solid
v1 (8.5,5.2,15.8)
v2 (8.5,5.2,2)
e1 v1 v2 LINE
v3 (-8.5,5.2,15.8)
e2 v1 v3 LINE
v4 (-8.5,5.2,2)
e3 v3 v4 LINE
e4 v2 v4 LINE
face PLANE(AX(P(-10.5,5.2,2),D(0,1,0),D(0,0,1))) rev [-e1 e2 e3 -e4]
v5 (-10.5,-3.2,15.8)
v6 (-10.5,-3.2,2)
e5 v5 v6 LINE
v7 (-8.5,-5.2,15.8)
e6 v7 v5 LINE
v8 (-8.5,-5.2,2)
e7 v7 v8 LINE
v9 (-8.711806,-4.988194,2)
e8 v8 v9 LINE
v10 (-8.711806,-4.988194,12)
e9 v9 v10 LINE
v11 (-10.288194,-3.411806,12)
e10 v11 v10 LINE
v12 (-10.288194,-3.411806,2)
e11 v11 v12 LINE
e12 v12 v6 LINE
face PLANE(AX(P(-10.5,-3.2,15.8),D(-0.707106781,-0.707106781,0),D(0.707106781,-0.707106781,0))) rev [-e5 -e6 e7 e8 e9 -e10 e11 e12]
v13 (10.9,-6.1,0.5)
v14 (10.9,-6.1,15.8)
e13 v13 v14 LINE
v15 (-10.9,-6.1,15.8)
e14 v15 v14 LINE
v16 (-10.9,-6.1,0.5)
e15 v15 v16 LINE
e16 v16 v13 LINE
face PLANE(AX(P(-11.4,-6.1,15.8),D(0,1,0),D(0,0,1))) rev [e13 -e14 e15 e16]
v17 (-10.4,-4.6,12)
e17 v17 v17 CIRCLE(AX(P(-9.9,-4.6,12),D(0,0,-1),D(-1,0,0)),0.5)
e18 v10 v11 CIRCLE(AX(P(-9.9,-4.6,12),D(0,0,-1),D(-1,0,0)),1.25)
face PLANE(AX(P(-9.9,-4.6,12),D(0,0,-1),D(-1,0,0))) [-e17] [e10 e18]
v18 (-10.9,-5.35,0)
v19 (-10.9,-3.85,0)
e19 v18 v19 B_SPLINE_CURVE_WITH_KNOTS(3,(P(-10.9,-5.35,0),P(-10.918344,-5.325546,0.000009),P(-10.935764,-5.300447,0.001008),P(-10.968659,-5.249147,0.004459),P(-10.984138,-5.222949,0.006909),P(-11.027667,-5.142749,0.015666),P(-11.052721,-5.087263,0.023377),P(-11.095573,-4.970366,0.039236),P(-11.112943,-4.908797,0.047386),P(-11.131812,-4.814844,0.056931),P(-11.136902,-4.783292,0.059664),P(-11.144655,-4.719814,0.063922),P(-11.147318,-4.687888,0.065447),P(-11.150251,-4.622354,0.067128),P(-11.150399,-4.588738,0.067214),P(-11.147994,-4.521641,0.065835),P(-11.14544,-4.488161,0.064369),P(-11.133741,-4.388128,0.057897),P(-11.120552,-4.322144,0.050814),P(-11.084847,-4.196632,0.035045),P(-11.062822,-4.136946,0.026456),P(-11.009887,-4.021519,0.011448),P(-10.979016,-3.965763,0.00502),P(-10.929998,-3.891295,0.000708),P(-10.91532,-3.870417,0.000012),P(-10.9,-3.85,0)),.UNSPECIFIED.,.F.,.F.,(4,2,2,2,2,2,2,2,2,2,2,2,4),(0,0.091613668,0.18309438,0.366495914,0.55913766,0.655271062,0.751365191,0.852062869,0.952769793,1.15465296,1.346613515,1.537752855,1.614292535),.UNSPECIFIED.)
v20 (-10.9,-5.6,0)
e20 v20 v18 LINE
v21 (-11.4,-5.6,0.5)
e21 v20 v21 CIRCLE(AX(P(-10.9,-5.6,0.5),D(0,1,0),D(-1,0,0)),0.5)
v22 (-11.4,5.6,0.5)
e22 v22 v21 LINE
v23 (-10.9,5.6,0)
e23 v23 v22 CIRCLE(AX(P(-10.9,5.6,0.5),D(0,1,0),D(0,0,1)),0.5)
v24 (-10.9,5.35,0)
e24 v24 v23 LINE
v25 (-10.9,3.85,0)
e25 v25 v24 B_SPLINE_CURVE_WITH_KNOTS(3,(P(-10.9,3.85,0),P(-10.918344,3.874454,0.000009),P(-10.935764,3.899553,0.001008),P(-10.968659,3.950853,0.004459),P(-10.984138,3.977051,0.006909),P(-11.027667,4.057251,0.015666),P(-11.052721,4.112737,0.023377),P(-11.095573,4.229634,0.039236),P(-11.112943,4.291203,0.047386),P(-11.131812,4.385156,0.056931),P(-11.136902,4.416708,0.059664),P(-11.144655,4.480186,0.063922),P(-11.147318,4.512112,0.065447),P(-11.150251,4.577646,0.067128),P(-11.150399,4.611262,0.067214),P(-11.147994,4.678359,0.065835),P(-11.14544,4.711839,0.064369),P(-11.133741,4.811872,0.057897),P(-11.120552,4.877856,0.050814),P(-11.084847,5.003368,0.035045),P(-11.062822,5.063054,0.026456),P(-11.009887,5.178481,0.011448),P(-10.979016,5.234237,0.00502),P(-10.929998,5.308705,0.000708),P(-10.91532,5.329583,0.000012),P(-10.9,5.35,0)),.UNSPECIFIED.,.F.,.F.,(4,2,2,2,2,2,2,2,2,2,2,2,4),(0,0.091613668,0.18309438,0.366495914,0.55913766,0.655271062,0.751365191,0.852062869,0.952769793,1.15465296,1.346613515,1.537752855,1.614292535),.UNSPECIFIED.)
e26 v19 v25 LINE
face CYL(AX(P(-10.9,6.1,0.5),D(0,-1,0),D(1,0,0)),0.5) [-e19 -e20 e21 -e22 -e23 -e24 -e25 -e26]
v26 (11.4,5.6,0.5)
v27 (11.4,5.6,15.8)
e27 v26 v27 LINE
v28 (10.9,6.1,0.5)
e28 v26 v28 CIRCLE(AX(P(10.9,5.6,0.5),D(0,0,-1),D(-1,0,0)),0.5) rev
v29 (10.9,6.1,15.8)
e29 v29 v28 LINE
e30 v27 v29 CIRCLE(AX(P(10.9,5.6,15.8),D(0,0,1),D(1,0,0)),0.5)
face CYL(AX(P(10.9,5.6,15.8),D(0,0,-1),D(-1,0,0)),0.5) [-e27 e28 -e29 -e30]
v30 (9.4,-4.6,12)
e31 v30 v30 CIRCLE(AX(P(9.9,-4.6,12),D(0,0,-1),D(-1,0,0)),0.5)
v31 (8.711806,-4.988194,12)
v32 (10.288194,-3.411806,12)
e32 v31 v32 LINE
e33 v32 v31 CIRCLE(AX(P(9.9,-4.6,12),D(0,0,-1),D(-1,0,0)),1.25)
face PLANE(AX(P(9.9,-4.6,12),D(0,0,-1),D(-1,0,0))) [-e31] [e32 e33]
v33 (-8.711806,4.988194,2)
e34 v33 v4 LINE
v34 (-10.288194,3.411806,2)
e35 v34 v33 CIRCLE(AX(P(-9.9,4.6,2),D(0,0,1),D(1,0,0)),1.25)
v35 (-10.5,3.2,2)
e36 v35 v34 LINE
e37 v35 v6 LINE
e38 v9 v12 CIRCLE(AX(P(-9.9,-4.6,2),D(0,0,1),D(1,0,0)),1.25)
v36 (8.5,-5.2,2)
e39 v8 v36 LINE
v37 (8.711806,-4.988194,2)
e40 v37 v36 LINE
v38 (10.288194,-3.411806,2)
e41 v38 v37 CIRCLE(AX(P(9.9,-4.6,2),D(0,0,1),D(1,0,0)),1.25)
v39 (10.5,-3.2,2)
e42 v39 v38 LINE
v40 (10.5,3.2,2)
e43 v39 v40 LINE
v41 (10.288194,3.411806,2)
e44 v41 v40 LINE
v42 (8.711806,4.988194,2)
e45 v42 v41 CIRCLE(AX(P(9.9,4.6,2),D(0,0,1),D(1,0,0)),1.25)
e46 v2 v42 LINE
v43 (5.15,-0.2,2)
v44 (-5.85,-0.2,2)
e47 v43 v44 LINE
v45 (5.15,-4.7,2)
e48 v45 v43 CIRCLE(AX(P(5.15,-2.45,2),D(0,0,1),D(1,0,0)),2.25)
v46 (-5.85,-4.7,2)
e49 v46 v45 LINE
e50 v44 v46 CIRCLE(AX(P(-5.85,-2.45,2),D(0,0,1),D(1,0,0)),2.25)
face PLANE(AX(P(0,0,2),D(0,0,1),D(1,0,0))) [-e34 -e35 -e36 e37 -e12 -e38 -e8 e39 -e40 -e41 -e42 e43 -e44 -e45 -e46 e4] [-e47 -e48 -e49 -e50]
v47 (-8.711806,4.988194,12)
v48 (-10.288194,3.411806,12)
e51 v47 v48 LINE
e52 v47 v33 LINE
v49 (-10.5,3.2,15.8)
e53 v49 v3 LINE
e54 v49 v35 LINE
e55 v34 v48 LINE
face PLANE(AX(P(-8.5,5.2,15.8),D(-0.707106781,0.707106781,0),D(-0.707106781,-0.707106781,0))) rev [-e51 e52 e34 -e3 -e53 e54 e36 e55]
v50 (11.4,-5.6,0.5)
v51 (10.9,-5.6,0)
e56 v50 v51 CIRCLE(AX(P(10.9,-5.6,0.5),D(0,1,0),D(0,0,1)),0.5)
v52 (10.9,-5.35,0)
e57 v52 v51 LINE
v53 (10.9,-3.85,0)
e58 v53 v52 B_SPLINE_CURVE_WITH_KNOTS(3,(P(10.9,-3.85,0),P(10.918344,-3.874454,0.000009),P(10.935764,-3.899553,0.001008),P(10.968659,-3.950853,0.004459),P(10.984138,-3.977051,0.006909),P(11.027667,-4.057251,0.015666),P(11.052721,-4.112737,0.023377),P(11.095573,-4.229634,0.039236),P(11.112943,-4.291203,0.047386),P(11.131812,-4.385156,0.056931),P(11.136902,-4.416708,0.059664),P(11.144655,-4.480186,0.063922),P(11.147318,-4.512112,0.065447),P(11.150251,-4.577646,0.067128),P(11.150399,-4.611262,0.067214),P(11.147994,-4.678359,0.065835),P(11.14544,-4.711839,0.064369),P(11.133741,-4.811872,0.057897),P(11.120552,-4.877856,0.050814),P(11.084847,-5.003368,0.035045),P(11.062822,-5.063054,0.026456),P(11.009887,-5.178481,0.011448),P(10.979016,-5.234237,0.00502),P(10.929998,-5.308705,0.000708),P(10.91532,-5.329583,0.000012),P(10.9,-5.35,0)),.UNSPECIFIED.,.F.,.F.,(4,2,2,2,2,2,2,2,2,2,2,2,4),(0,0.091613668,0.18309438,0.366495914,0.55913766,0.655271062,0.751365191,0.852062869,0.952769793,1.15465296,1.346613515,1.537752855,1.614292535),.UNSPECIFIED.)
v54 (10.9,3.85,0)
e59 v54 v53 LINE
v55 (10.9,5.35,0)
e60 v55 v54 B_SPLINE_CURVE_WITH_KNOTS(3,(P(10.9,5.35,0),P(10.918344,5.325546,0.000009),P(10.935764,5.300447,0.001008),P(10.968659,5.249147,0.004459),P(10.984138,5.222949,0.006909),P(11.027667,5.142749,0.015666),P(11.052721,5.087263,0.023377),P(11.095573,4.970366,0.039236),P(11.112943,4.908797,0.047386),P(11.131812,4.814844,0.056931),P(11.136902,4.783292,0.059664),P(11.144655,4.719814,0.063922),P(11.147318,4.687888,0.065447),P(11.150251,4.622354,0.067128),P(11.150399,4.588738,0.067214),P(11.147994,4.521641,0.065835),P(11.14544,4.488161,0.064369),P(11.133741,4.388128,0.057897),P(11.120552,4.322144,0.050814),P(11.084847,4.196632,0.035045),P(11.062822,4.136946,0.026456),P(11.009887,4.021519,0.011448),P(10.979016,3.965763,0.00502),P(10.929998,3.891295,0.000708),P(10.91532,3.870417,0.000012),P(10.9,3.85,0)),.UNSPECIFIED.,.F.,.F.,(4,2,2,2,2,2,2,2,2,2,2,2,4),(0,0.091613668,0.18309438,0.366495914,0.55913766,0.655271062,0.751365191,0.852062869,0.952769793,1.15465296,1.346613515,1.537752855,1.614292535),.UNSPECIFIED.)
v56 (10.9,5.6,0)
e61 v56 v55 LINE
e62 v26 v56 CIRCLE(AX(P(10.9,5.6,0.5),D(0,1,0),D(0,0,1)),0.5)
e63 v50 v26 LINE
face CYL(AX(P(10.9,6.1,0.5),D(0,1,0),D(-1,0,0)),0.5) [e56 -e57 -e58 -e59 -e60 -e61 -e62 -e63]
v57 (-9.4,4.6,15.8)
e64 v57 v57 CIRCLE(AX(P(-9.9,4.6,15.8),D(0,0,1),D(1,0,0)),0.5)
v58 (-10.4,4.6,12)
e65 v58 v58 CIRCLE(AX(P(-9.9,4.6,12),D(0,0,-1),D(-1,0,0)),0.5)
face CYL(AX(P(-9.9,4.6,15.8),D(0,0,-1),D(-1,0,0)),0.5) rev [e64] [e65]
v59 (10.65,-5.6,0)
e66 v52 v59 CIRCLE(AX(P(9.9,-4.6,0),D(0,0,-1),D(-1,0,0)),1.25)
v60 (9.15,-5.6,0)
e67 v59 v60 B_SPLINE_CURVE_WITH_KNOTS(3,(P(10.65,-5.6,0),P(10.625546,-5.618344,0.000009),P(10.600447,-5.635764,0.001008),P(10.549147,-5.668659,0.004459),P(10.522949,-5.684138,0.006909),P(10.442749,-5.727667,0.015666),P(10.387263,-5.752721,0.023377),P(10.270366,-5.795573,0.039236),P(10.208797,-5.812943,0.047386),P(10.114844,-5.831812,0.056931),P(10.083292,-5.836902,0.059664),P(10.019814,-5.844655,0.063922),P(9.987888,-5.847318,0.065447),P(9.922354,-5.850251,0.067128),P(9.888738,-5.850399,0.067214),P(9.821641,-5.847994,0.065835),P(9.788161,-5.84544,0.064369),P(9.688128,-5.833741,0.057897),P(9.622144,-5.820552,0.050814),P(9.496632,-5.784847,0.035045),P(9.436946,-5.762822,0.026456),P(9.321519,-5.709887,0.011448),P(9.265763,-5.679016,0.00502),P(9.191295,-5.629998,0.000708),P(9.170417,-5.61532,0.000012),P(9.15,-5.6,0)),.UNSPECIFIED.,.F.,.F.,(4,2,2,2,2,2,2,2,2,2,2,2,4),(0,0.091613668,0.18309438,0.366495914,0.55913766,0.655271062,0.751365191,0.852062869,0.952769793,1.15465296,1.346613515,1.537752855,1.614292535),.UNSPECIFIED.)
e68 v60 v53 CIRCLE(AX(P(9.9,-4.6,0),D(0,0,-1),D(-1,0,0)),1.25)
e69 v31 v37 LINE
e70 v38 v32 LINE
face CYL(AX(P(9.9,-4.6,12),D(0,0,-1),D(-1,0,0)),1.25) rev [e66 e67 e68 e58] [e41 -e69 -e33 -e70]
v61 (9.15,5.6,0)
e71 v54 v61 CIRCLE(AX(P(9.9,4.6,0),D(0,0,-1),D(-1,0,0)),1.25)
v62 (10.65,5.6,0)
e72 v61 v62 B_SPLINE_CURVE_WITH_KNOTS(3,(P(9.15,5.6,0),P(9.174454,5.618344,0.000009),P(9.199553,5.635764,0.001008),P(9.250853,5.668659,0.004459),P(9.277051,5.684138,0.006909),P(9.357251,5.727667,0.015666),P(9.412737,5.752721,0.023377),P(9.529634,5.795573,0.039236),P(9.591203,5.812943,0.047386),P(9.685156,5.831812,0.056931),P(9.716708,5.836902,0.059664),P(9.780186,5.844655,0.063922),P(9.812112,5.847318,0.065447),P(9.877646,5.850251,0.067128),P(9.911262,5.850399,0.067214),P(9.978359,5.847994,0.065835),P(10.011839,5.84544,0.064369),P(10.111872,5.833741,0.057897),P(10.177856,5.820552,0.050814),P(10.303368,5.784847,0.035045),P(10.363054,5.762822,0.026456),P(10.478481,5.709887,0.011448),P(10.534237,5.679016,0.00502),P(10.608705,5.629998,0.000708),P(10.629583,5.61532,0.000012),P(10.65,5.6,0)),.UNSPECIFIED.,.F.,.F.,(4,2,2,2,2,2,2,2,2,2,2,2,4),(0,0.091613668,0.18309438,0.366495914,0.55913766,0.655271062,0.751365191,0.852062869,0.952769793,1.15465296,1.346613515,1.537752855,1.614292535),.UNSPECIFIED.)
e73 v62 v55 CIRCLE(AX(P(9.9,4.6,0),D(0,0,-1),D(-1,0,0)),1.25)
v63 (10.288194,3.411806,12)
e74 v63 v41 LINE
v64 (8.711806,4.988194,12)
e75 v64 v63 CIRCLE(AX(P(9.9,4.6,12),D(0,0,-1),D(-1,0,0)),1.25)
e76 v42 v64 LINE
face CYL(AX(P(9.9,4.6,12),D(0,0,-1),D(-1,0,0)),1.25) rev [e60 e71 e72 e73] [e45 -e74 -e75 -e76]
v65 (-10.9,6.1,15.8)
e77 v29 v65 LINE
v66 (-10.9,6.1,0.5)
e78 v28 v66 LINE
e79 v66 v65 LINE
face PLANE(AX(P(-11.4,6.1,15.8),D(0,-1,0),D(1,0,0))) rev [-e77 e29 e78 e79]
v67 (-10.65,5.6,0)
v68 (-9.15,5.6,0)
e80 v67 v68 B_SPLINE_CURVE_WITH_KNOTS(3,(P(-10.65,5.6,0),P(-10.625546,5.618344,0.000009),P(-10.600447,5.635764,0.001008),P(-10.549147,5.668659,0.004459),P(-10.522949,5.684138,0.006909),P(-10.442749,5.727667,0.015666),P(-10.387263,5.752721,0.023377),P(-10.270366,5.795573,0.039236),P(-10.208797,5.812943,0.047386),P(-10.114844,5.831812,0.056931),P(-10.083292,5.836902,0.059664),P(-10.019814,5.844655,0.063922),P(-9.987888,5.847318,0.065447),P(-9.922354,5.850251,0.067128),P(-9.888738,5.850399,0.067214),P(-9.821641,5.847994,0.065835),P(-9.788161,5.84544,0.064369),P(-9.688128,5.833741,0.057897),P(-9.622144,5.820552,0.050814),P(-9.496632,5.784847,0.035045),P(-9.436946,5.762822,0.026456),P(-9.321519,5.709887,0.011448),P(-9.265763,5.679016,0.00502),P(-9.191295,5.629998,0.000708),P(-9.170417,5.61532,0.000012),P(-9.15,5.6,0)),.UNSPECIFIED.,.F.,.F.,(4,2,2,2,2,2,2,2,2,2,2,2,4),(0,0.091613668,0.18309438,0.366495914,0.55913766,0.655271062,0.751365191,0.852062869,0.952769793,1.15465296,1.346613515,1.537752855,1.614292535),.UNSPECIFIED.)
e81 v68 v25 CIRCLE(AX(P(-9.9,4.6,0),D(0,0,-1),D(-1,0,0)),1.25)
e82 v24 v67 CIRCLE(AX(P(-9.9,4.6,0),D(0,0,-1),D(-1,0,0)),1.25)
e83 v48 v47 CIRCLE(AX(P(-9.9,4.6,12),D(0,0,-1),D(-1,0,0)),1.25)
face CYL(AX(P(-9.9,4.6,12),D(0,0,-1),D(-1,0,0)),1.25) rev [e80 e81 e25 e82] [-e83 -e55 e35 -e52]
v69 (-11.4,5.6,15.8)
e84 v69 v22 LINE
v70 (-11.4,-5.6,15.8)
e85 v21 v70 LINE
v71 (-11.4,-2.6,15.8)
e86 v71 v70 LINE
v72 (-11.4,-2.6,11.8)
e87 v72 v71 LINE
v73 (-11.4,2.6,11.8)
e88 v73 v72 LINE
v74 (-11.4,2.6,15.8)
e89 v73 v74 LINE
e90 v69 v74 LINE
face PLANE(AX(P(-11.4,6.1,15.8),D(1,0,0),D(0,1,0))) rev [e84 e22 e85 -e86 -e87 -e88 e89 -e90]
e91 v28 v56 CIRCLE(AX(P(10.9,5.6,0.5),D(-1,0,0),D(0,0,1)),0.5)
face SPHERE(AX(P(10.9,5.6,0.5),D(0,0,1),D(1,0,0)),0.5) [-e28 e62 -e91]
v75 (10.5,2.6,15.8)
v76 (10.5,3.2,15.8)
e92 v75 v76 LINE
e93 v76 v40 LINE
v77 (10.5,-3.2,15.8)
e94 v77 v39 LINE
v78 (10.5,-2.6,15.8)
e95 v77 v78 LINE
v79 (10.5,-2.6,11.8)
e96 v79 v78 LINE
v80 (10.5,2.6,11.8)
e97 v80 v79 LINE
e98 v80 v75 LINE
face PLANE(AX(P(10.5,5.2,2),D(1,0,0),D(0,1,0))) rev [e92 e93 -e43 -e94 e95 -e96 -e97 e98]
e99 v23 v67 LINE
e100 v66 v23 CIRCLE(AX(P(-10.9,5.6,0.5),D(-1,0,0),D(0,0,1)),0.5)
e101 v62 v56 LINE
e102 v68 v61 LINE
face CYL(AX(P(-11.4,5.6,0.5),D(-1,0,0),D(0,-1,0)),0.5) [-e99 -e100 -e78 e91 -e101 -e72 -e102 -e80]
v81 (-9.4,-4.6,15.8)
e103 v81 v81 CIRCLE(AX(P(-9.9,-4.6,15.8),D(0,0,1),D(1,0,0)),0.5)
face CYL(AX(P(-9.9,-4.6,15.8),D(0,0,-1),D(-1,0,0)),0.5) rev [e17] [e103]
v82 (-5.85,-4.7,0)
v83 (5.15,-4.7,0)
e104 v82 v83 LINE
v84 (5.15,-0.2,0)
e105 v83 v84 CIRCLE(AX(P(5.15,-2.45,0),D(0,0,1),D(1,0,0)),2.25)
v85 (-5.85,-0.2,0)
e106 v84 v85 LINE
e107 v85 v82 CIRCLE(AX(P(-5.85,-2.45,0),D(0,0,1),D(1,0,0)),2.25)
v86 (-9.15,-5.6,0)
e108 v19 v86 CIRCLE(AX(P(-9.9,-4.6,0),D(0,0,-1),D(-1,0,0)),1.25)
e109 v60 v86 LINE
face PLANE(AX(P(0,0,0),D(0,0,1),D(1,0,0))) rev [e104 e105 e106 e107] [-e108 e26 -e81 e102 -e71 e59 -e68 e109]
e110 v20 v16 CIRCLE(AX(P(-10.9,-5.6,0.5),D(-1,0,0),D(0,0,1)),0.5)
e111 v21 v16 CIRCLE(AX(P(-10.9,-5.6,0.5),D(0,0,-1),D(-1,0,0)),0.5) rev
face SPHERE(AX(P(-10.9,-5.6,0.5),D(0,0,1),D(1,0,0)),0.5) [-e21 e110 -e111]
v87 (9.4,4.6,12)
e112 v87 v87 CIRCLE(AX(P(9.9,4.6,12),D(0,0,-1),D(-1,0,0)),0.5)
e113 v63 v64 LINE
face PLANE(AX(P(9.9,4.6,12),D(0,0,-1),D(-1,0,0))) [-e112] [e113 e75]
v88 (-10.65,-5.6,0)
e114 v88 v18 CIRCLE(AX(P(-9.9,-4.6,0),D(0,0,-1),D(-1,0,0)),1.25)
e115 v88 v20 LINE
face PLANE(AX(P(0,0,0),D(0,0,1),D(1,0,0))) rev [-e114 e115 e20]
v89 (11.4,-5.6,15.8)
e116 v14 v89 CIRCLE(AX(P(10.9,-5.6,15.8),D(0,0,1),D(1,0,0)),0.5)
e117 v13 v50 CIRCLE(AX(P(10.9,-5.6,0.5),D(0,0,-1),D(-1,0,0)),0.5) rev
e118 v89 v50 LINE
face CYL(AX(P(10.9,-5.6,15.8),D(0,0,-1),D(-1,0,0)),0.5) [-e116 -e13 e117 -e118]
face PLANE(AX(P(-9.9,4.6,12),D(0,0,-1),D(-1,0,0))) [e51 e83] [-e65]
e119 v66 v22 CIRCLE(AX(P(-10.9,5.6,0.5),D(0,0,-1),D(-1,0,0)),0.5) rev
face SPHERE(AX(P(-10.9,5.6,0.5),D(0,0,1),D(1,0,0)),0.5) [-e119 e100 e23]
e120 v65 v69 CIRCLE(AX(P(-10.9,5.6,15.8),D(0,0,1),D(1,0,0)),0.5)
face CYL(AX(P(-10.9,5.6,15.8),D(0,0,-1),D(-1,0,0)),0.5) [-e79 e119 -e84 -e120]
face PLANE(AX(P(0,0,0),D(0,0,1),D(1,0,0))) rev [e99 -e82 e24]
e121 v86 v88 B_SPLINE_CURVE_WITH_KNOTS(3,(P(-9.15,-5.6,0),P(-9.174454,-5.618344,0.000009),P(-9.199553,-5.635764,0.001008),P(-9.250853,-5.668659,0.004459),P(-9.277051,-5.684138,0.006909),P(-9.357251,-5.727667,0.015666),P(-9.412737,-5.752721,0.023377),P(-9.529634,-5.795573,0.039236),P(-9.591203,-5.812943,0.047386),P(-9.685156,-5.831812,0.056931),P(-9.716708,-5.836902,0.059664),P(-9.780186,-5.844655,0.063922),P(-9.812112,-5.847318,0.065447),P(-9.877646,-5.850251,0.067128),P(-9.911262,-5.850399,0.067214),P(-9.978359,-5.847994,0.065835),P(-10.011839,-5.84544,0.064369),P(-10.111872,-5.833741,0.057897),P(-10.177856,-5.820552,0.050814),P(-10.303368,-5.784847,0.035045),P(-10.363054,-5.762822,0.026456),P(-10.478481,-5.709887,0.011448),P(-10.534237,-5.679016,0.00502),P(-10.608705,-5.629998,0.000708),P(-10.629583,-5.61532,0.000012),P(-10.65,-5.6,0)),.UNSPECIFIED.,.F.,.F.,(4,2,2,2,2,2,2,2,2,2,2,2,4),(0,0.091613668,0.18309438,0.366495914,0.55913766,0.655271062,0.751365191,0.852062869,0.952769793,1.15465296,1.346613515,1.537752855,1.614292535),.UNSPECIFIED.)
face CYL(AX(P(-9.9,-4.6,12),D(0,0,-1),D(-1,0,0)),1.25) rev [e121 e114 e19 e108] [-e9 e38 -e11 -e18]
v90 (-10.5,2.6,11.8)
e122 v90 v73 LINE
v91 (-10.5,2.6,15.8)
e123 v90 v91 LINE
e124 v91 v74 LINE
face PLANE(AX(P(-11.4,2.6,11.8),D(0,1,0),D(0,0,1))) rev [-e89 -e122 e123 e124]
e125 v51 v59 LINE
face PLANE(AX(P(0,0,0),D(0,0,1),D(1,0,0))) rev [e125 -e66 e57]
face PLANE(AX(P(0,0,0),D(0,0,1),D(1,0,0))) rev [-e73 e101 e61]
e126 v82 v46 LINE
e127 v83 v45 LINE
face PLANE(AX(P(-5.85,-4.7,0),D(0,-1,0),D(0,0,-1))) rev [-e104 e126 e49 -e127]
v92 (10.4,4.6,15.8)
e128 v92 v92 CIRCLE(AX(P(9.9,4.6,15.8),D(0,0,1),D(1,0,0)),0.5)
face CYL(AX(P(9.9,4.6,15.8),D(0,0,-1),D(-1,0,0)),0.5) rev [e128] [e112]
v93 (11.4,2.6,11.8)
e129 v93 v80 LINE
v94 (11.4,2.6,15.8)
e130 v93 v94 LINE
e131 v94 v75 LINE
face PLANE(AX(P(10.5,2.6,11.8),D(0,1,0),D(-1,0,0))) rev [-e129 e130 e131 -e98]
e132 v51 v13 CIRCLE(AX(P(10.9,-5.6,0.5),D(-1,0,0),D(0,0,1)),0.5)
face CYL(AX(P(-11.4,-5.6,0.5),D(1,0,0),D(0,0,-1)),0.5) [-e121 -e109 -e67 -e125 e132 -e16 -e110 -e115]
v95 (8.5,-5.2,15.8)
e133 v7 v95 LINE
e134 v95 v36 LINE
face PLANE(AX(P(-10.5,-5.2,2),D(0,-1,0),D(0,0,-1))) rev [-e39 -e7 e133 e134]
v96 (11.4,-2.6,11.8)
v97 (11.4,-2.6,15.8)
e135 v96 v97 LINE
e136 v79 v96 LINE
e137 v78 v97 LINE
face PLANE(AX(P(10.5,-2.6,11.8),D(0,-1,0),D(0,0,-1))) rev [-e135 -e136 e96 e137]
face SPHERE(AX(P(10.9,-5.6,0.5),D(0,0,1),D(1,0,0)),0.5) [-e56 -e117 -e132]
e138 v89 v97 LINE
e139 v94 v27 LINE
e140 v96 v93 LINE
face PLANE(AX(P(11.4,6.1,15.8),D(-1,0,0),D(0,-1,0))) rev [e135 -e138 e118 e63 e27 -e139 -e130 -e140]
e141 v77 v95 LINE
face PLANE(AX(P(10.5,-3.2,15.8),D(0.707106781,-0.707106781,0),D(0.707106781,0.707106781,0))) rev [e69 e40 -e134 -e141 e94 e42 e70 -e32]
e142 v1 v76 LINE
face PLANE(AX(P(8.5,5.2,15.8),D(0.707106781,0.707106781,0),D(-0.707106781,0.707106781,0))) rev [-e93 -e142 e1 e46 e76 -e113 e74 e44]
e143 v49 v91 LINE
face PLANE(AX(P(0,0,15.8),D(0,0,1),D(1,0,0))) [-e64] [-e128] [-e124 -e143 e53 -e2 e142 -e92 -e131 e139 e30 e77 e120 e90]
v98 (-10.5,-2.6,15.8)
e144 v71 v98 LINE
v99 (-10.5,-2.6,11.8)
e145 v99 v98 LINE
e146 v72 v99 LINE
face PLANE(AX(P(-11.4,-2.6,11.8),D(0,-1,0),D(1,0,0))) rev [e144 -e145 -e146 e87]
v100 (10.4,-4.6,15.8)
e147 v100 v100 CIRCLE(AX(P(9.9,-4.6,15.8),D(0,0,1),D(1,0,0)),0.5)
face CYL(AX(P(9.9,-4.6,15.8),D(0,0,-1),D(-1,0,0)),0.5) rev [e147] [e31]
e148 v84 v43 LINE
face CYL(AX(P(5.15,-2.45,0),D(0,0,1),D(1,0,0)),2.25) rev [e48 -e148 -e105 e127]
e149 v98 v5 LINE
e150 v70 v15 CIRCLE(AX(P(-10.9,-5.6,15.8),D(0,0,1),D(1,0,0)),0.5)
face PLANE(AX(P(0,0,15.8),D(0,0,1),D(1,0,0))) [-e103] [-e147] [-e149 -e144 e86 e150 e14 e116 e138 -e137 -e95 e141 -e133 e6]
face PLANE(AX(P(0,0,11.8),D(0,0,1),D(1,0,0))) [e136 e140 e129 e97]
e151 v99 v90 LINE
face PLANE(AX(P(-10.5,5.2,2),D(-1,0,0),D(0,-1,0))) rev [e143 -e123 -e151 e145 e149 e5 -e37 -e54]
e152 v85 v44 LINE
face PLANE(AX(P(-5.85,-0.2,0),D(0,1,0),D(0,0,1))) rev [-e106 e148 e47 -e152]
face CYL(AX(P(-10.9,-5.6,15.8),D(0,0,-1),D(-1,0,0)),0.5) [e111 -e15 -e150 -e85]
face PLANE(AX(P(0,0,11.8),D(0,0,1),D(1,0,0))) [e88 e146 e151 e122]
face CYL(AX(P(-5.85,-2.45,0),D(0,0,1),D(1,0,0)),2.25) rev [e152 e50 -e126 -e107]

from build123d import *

# Parameters (mm, degrees)
SKETCH_1_W               = 22.8
SKETCH_1_H               = 12.2
EXTRUDE_1_DEPTH          = 15.8
SKETCH_2_W               = 21
SKETCH_2_H               = 10.4
CUT_EXTRUDE_1_DEPTH      = 13.8
SKETCH_4_W               = 0.9
SKETCH_4_H               = 5.2
CUT_EXTRUDE_2_DEPTH      = 4
CUT_EXTRUDE_5_DEPTH      = 2
FILLET_2_R               = 0.5
SKETCH_8_W               = 0.9
SKETCH_8_H               = 5.2
CUT_EXTRUDE_6_DEPTH      = 4
EXTRUDE_2_DEPTH          = 13.8
CUT_EXTRUDE_8_DEPTH      = 19.91057905
CUT_EXTRUDE_8_DEPTH_BACK = 19.91057905
SKETCH_3_R               = 0.5
SKETCH_9_R               = 1.25
CUT_EXTRUDE_9_DEPTH      = 12
FILLET_3_R               = 0.5


with BuildPart() as part:
    # 草图1 → 凸台-拉伸1 (new body)
    with BuildSketch(Plane.XY):
        Rectangle(SKETCH_1_W, SKETCH_1_H)
    extrude(amount=EXTRUDE_1_DEPTH)

    # 草图2 → 切除-拉伸1 (cut)
    with BuildSketch(Plane.XY.offset(15.8)):
        Rectangle(SKETCH_2_W, SKETCH_2_H)
    extrude(amount=-CUT_EXTRUDE_1_DEPTH, mode=Mode.SUBTRACT)

    # 草图4 → 切除-拉伸2 (cut)
    with BuildSketch(Plane.XY.offset(15.8)):
        with Locations((-10.95, 0)):
            Rectangle(SKETCH_4_W, SKETCH_4_H)
    extrude(amount=-CUT_EXTRUDE_2_DEPTH, mode=Mode.SUBTRACT)

    # 草图7 → 切除-拉伸5 (cut)
    with BuildSketch(Plane.XY.offset(2)):
        with BuildLine():
            Line((-5.85, -0.2), (5.15, -0.2))
            ThreePointArc((5.15, -0.2), (7.4, -2.45), (5.15, -4.7))
            Line((5.15, -4.7), (-5.85, -4.7))
            ThreePointArc((-5.85, -4.7), (-8.1, -2.45), (-5.85, -0.2))
        make_face()
    extrude(amount=-CUT_EXTRUDE_5_DEPTH, mode=Mode.SUBTRACT)

    # 圆角2
    fillet_2_edges = [part.edges().sort_by_distance(p)[0] for p in [
        (11.4, -6.1, 7.9),
        (-11.4, -6.1, 7.9),
        (-11.4, 6.1, 7.9),
        (11.4, 6.1, 7.9),
    ]]
    fillet(fillet_2_edges, radius=FILLET_2_R)

    # 草图8 → 切除-拉伸6 (cut)
    with BuildSketch(Plane.XY.offset(15.8)):
        with Locations((10.95, 0)):
            Rectangle(SKETCH_8_W, SKETCH_8_H)
    extrude(amount=-CUT_EXTRUDE_6_DEPTH, mode=Mode.SUBTRACT)

    # 草图10 → 凸台-拉伸2 (add)
    with BuildSketch(Plane.XY.offset(2)):
        Polygon((-10.5, 3.2), (-10.5, 5.2), (-8.5, 5.2), align=None)
        Polygon((8.5, 5.2), (10.5, 5.2), (10.5, 3.2), align=None)
        Polygon((10.5, -3.2), (10.5, -5.2), (8.5, -5.2), align=None)
        Polygon((-10.5, -3.2), (-10.5, -5.2), (-8.5, -5.2), align=None)
    extrude(amount=EXTRUDE_2_DEPTH)

    # 草图3 → 切除-拉伸8 (cut, two sides: drawn at the far end of the back side and taken through both)
    with BuildSketch(Plane.XY.offset(2).offset(-CUT_EXTRUDE_8_DEPTH_BACK)):
        with Locations((9.9, 4.6)):
            Circle(SKETCH_3_R)
        with Locations((-9.9, -4.6)):
            Circle(SKETCH_3_R)
        with Locations((9.9, -4.6)):
            Circle(SKETCH_3_R)
        with Locations((-9.9, 4.6)):
            Circle(SKETCH_3_R)
    extrude(amount=CUT_EXTRUDE_8_DEPTH + CUT_EXTRUDE_8_DEPTH_BACK, mode=Mode.SUBTRACT)

    # 草图9 → 切除-拉伸9 (cut)
    with BuildSketch(Plane(origin=(0, 0, 0), x_dir=(-1, 0, 0), z_dir=(0, 0, -1))):
        with Locations((-9.9, 4.6)):
            Circle(SKETCH_9_R)
        with Locations((9.9, 4.6)):
            Circle(SKETCH_9_R)
        with Locations((-9.9, -4.6)):
            Circle(SKETCH_9_R)
        with Locations((9.9, -4.6)):
            Circle(SKETCH_9_R)
    extrude(amount=-CUT_EXTRUDE_9_DEPTH, mode=Mode.SUBTRACT)

    # 圆角3
    # the kernel refuses this fillet: 0.5 mm, written as the material it takes off along each edge
    with BuildSketch(Plane(origin=(-10.9, 6.1, 0), x_dir=(0, 0, 1), z_dir=(1, 0, 0))) as fillet_3_piece_1:
        with BuildLine():
            CenterArc((FILLET_3_R, FILLET_3_R), FILLET_3_R, 180, 90)
            Line((0, FILLET_3_R), (0, 0))
            Line((0, 0), (FILLET_3_R, 0))
        make_face()
    extrude(amount=21.8, mode=Mode.SUBTRACT)
    with BuildSketch(Plane(origin=(11.4, 5.6, 0), x_dir=(-1, 0, 0), z_dir=(0, -1, 0)), Plane(origin=(-11.4, -5.6, 0), x_dir=(1, 0, 0), z_dir=(0, 1, 0))) as fillet_3_piece_2:
        with BuildLine():
            CenterArc((FILLET_3_R, -FILLET_3_R), FILLET_3_R, 90, 90)
            Line((0, -FILLET_3_R), (0, 0))
            Line((0, 0), (FILLET_3_R, 0))
        make_face()
    extrude(amount=11.2, mode=Mode.SUBTRACT)
    with BuildSketch(Plane(origin=(10.9, -6.1, 0), x_dir=(0, 1, 0), z_dir=(-1, 0, 0))) as fillet_3_piece_3:
        with BuildLine():
            CenterArc((FILLET_3_R, -FILLET_3_R), FILLET_3_R, 90, 90)
            Line((0, -FILLET_3_R), (0, 0))
            Line((0, 0), (FILLET_3_R, 0))
        make_face()
    extrude(amount=21.8, mode=Mode.SUBTRACT)
    with BuildSketch(Plane(origin=(-10.9, 5.6, 0), x_dir=(0, 1, 0), z_dir=(1, 0, 0))) as fillet_3_piece_4:
        with BuildLine():
            CenterArc((0.5 - FILLET_3_R, FILLET_3_R), FILLET_3_R, 270, 90)
            Line((0.5, FILLET_3_R), (0.5, 0))
            Line((0.5, 0), (0.5 - FILLET_3_R, 0))
        make_face()
    revolve(axis=Axis((-10.9, 5.6, 0), (0, 0, 1)), revolution_arc=90, mode=Mode.SUBTRACT)
    with BuildSketch(Plane(origin=(-10.9, -5.6, 0), x_dir=(-1, 0, 0), z_dir=(0, 1, 0))) as fillet_3_piece_5:
        with BuildLine():
            CenterArc((0.5 - FILLET_3_R, FILLET_3_R), FILLET_3_R, 270, 90)
            Line((0.5, FILLET_3_R), (0.5, 0))
            Line((0.5, 0), (0.5 - FILLET_3_R, 0))
        make_face()
    revolve(axis=Axis((-10.9, -5.6, 0), (0, 0, 1)), revolution_arc=90, mode=Mode.SUBTRACT)
    with BuildSketch(Plane(origin=(10.9, -5.6, 0), x_dir=(1, 0, 0), z_dir=(0, 1, 0))) as fillet_3_piece_6:
        with BuildLine():
            CenterArc((0.5 - FILLET_3_R, -FILLET_3_R), FILLET_3_R, 0, 90)
            Line((0.5, -FILLET_3_R), (0.5, 0))
            Line((0.5, 0), (0.5 - FILLET_3_R, 0))
        make_face()
    revolve(axis=Axis((10.9, -5.6, 0), (0, 0, -1)), revolution_arc=90, mode=Mode.SUBTRACT)
    with BuildSketch(Plane(origin=(10.9, 5.6, 0), x_dir=(0, 1, 0), z_dir=(-1, 0, 0))) as fillet_3_piece_7:
        with BuildLine():
            CenterArc((0.5 - FILLET_3_R, -FILLET_3_R), FILLET_3_R, 0, 90)
            Line((0.5, -FILLET_3_R), (0.5, 0))
            Line((0.5, 0), (0.5 - FILLET_3_R, 0))
        make_face()
    revolve(axis=Axis((10.9, 5.6, 0), (0, 0, -1)), revolution_arc=90, mode=Mode.SUBTRACT)


solid = part.part
